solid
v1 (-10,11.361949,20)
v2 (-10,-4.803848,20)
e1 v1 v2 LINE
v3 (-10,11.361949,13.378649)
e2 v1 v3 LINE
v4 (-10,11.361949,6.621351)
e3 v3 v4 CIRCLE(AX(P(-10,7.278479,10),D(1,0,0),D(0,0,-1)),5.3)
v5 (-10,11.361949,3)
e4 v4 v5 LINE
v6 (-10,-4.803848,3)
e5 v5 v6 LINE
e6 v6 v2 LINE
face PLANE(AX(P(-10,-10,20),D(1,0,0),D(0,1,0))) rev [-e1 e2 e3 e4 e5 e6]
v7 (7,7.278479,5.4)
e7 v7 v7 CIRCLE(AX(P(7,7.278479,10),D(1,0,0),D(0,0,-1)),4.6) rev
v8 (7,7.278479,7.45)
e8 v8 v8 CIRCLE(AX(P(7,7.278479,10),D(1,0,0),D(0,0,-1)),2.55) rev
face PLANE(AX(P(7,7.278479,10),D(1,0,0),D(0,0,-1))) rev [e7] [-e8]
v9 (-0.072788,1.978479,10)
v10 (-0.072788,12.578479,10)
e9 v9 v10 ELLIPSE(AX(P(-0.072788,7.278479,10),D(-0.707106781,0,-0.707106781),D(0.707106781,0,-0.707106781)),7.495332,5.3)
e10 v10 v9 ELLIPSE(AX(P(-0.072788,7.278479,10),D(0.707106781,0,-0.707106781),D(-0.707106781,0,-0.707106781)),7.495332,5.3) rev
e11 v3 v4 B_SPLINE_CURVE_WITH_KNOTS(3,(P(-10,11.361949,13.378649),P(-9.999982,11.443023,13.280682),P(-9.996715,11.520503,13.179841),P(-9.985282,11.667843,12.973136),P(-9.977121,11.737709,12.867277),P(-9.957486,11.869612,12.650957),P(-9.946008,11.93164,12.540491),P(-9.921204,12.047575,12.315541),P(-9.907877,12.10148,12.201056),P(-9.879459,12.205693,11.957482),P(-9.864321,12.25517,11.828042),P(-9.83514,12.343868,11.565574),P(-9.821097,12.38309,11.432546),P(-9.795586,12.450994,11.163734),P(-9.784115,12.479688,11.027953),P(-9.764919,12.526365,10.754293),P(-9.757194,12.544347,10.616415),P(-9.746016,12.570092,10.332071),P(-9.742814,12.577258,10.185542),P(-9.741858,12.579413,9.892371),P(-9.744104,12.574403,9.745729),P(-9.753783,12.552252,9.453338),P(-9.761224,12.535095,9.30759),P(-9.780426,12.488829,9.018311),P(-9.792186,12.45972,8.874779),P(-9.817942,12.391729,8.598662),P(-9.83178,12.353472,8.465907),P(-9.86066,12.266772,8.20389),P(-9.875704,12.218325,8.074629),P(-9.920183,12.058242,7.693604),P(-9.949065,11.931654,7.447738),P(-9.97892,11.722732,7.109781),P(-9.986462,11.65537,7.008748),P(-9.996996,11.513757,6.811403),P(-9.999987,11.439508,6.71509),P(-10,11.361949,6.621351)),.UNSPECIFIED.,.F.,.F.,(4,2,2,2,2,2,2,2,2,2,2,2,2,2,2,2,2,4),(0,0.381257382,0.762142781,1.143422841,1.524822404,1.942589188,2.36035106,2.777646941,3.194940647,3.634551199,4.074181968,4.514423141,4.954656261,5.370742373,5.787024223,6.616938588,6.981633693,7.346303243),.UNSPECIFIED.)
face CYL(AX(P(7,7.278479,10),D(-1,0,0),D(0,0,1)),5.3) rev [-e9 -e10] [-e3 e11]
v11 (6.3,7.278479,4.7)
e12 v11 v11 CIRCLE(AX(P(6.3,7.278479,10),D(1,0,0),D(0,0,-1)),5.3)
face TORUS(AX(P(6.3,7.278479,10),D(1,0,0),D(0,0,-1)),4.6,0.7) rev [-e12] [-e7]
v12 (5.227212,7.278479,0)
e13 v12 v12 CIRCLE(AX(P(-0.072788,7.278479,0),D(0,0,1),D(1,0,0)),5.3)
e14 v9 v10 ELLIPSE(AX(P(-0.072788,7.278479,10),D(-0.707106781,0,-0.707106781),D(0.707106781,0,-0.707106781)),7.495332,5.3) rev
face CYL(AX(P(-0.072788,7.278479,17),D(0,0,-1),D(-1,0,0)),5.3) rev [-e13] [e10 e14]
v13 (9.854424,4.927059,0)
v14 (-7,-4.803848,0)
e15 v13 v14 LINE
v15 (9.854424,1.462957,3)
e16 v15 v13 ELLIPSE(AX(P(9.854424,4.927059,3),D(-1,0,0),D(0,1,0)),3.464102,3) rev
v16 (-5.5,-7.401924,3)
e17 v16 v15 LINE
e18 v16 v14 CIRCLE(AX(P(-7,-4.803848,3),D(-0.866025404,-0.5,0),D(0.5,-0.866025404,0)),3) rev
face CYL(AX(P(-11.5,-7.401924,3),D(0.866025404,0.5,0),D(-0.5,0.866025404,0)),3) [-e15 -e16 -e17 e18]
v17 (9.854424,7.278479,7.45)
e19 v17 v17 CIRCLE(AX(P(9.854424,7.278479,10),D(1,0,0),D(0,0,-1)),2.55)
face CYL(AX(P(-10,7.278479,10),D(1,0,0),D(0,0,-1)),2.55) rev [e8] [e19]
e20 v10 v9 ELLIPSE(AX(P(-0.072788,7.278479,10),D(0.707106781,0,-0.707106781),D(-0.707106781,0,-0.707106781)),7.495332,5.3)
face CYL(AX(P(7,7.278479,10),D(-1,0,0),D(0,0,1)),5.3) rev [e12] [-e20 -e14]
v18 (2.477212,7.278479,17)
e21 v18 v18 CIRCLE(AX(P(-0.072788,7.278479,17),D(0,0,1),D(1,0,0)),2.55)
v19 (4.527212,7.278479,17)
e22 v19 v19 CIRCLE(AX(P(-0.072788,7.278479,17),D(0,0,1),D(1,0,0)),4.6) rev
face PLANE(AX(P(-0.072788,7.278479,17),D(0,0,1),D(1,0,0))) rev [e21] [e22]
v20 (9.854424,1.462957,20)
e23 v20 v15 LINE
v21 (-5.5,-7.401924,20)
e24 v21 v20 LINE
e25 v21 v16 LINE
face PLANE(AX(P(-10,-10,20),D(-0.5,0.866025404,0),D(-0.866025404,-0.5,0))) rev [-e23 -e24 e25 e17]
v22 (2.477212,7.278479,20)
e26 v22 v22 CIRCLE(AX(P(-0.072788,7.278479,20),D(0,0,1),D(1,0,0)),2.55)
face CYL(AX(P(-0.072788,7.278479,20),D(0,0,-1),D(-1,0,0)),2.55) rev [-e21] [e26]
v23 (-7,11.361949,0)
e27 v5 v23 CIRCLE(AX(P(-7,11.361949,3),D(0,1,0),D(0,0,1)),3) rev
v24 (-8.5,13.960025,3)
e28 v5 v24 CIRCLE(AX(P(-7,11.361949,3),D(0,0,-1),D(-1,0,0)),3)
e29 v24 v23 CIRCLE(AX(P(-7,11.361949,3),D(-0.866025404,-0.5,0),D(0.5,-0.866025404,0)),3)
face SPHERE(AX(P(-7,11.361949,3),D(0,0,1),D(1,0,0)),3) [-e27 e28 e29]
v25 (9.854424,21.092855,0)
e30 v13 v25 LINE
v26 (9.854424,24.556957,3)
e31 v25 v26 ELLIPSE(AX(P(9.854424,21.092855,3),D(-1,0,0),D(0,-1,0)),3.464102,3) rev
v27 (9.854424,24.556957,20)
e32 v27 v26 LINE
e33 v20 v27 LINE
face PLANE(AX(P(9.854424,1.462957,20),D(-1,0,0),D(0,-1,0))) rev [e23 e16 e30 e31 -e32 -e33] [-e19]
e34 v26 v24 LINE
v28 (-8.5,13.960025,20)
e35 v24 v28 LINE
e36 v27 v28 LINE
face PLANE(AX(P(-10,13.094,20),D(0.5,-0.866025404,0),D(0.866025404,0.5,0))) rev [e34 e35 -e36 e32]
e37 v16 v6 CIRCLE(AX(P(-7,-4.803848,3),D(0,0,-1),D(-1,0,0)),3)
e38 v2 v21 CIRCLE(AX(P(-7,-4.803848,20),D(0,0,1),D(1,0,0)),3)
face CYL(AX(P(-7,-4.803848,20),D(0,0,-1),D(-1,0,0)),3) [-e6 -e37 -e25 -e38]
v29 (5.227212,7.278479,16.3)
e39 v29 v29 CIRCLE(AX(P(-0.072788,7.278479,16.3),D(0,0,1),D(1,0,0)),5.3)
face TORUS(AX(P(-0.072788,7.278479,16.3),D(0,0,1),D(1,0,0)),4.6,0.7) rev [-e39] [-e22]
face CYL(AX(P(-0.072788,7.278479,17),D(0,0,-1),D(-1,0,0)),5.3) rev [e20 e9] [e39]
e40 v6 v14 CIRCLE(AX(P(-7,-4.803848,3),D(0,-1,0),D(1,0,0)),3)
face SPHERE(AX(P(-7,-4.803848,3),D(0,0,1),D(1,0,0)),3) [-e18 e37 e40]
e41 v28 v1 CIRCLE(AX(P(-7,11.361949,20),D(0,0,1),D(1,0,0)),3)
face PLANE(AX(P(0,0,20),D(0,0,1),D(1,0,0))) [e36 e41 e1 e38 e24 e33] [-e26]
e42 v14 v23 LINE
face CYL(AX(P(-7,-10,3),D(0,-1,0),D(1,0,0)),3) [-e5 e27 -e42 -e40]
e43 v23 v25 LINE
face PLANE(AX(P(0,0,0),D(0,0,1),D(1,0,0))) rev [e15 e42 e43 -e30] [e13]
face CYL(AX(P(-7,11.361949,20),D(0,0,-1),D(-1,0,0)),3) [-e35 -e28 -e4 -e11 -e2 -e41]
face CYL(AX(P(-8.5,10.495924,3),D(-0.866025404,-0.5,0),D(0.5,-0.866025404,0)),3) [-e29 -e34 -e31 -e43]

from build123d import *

# Parameters (mm, degrees)
BOSS_EXTRUDE1_DEPTH     = 20
SKETCH4_R               = 2.55
CUT_EXTRUDE2_DEPTH      = 34.212108316
CUT_EXTRUDE3_DEPTH      = 34.212108316
CUT_EXTRUDE3_DEPTH_BACK = 34.212108316
SKETCH5_R               = 2.55
SKETCH6_R               = 5.3
CUT_EXTRUDE4_DEPTH      = 17
CUT_EXTRUDE5_DEPTH      = 7
CUT_EXTRUDE5_DEPTH_BACK = 10
SKETCH7_R               = 5.3
FILLET1_R               = 0.7
FILLET2_R               = 3


with BuildPart() as part:
    # Sketch1 → Boss-Extrude1 (new body)
    with BuildSketch(Plane.XY):
        Polygon((-10, 13.094), (9.854423989, 24.556957035), (9.854423989, 1.462957035), (-10, -10), align=None)
    extrude(amount=BOSS_EXTRUDE1_DEPTH)

    # Sketch4 → Cut-Extrude2 (cut, through all)
    with BuildSketch(Plane.XY):
        with Locations((-0.072788005, 7.278478517)):
            Circle(SKETCH4_R)
    extrude(amount=CUT_EXTRUDE2_DEPTH, mode=Mode.SUBTRACT)

    # Sketch5 → Cut-Extrude3 (cut, two sides: drawn at the far end of the back side and taken through both)
    with BuildSketch(Plane(origin=(0, 0, 0), x_dir=(0, 0, -1), z_dir=(1, 0, 0)).offset(-CUT_EXTRUDE3_DEPTH_BACK)):
        with Locations((-10, 7.278478517)):
            Circle(SKETCH5_R)
    extrude(amount=CUT_EXTRUDE3_DEPTH + CUT_EXTRUDE3_DEPTH_BACK, mode=Mode.SUBTRACT)

    # Sketch6 → Cut-Extrude4 (cut)
    with BuildSketch(Plane.XY):
        with Locations((-0.072788005, 7.278478517)):
            Circle(SKETCH6_R)
    extrude(amount=CUT_EXTRUDE4_DEPTH, mode=Mode.SUBTRACT)

    # Sketch7 → Cut-Extrude5 (cut, two sides: drawn at the far end of the back side and taken through both)
    with BuildSketch(Plane(origin=(0, 0, 0), x_dir=(0, 0, -1), z_dir=(1, 0, 0)).offset(-CUT_EXTRUDE5_DEPTH_BACK)):
        with Locations(Location((-10, 7.278478517, 0), (0, 0, 90))):
            Circle(SKETCH7_R)
    extrude(amount=CUT_EXTRUDE5_DEPTH + CUT_EXTRUDE5_DEPTH_BACK, mode=Mode.SUBTRACT)

    # Fillet1
    fillet1_edges = [part.edges().sort_by_distance(p)[0] for p in [
        (-5.372788005, 7.278478517, 17),
        (7, 1.978478517, 10),
    ]]
    fillet(fillet1_edges, radius=FILLET1_R)

    # Fillet2
    # the kernel refuses this fillet: 3 mm, written as the material it takes off along each edge
    with BuildSketch(Plane(origin=(-7, -4.803847577, 3), x_dir=(-1, 0, 0), z_dir=(0, 0, -1))) as fillet2_piece_1_section:
        Polygon((0, 0), (FILLET2_R, 0), (FILLET2_R, -FILLET2_R * 1.73205080757), (-FILLET2_R * 0.5, -FILLET2_R * 0.866025403784), align=None)
    fillet2_piece_1 = extrude(amount=FILLET2_R, mode=Mode.PRIVATE)
    fillet2_piece_1 = fillet2_piece_1 - Plane(origin=(-7, -4.803847577, 3), x_dir=(0.49999999999999906, 0.8660254037844392, 0), z_dir=(0, 0, -1)) * Sphere(FILLET2_R, mode=Mode.PRIVATE)
    add(fillet2_piece_1, mode=Mode.SUBTRACT)
    with BuildSketch(Plane(origin=(-7, 11.361949192, 3), x_dir=(-0.5000000000000018, 0.8660254037844377, 0), z_dir=(0, 0, -1))) as fillet2_piece_2_section:
        Polygon((0, 0), (FILLET2_R, 0), (FILLET2_R, -FILLET2_R * 0.57735026919), (FILLET2_R * 0.5, -FILLET2_R * 0.866025403784), align=None)
    fillet2_piece_2 = extrude(amount=FILLET2_R, mode=Mode.PRIVATE)
    fillet2_piece_2 = fillet2_piece_2 - Plane(origin=(-7, 11.361949192, 3), x_dir=(0.8660254037844393, -0.49999999999999883, 0), z_dir=(0, 0, -1)) * Sphere(FILLET2_R, mode=Mode.PRIVATE)
    add(fillet2_piece_2, mode=Mode.SUBTRACT)
    with BuildSketch(Plane(origin=(-10, -4.803847577, 0), x_dir=(0, 0, 1), z_dir=(0, 1, 0))) as fillet2_piece_3:
        with BuildLine():
            CenterArc((FILLET2_R, FILLET2_R), FILLET2_R, 180, 90)
            Line((0, FILLET2_R), (0, 0))
            Line((0, 0), (FILLET2_R, 0))
        make_face()
    extrude(amount=16.16579677, mode=Mode.SUBTRACT)
    with BuildSketch(Plane(origin=(-8.5, 13.960025404, 0), x_dir=(0, 0, 1), z_dir=(0.8660254037844377, 0.5000000000000018, 0))) as fillet2_piece_4:
        with BuildLine():
            CenterArc((FILLET2_R, FILLET2_R), FILLET2_R, 180, 90)
            Line((0, FILLET2_R), (0, 0))
            Line((0, 0), (FILLET2_R, 0))
        make_face()
    extrude(amount=28.693863262, mode=Mode.SUBTRACT)
    with BuildSketch(Plane(origin=(16.349614518, 5.212957035, 0), x_dir=(0, 0, 1), z_dir=(-0.866025403784438, -0.5000000000000012, 0))) as fillet2_piece_5:
        with BuildLine():
            CenterArc((FILLET2_R, FILLET2_R), FILLET2_R, 180, 90)
            Line((0, FILLET2_R), (0, 0))
            Line((0, 0), (FILLET2_R, 0))
        make_face()
    extrude(amount=25.229761647, mode=Mode.SUBTRACT)
    with BuildSketch(Plane(origin=(-10, -10, 3), x_dir=(0, 1, 0), z_dir=(0, 0, 1))) as fillet2_piece_6:
        with BuildLine():
            CenterArc((FILLET2_R * 1.73205080757, -FILLET2_R), FILLET2_R, 90, 120)
            Line((FILLET2_R * 0.866025403784, -FILLET2_R * 1.5), (0, 0))
            Line((0, 0), (FILLET2_R * 1.73205080757, 0))
        make_face()
    extrude(amount=29.990381057, mode=Mode.SUBTRACT)
    with BuildSketch(Plane(origin=(-10, 13.094, 3), x_dir=(0.8660254037844375, 0.5000000000000019, 0), z_dir=(0, 0, 1))) as fillet2_piece_7:
        with BuildLine():
            CenterArc((FILLET2_R * 0.57735026919, -FILLET2_R), FILLET2_R, 90, 60)
            Line((-FILLET2_R * 0.288675134595, -FILLET2_R * 0.5), (0, 0))
            Line((0, 0), (FILLET2_R * 0.57735026919, 0))
        make_face()
    extrude(amount=21.330127019, mode=Mode.SUBTRACT)


solid = part.part
